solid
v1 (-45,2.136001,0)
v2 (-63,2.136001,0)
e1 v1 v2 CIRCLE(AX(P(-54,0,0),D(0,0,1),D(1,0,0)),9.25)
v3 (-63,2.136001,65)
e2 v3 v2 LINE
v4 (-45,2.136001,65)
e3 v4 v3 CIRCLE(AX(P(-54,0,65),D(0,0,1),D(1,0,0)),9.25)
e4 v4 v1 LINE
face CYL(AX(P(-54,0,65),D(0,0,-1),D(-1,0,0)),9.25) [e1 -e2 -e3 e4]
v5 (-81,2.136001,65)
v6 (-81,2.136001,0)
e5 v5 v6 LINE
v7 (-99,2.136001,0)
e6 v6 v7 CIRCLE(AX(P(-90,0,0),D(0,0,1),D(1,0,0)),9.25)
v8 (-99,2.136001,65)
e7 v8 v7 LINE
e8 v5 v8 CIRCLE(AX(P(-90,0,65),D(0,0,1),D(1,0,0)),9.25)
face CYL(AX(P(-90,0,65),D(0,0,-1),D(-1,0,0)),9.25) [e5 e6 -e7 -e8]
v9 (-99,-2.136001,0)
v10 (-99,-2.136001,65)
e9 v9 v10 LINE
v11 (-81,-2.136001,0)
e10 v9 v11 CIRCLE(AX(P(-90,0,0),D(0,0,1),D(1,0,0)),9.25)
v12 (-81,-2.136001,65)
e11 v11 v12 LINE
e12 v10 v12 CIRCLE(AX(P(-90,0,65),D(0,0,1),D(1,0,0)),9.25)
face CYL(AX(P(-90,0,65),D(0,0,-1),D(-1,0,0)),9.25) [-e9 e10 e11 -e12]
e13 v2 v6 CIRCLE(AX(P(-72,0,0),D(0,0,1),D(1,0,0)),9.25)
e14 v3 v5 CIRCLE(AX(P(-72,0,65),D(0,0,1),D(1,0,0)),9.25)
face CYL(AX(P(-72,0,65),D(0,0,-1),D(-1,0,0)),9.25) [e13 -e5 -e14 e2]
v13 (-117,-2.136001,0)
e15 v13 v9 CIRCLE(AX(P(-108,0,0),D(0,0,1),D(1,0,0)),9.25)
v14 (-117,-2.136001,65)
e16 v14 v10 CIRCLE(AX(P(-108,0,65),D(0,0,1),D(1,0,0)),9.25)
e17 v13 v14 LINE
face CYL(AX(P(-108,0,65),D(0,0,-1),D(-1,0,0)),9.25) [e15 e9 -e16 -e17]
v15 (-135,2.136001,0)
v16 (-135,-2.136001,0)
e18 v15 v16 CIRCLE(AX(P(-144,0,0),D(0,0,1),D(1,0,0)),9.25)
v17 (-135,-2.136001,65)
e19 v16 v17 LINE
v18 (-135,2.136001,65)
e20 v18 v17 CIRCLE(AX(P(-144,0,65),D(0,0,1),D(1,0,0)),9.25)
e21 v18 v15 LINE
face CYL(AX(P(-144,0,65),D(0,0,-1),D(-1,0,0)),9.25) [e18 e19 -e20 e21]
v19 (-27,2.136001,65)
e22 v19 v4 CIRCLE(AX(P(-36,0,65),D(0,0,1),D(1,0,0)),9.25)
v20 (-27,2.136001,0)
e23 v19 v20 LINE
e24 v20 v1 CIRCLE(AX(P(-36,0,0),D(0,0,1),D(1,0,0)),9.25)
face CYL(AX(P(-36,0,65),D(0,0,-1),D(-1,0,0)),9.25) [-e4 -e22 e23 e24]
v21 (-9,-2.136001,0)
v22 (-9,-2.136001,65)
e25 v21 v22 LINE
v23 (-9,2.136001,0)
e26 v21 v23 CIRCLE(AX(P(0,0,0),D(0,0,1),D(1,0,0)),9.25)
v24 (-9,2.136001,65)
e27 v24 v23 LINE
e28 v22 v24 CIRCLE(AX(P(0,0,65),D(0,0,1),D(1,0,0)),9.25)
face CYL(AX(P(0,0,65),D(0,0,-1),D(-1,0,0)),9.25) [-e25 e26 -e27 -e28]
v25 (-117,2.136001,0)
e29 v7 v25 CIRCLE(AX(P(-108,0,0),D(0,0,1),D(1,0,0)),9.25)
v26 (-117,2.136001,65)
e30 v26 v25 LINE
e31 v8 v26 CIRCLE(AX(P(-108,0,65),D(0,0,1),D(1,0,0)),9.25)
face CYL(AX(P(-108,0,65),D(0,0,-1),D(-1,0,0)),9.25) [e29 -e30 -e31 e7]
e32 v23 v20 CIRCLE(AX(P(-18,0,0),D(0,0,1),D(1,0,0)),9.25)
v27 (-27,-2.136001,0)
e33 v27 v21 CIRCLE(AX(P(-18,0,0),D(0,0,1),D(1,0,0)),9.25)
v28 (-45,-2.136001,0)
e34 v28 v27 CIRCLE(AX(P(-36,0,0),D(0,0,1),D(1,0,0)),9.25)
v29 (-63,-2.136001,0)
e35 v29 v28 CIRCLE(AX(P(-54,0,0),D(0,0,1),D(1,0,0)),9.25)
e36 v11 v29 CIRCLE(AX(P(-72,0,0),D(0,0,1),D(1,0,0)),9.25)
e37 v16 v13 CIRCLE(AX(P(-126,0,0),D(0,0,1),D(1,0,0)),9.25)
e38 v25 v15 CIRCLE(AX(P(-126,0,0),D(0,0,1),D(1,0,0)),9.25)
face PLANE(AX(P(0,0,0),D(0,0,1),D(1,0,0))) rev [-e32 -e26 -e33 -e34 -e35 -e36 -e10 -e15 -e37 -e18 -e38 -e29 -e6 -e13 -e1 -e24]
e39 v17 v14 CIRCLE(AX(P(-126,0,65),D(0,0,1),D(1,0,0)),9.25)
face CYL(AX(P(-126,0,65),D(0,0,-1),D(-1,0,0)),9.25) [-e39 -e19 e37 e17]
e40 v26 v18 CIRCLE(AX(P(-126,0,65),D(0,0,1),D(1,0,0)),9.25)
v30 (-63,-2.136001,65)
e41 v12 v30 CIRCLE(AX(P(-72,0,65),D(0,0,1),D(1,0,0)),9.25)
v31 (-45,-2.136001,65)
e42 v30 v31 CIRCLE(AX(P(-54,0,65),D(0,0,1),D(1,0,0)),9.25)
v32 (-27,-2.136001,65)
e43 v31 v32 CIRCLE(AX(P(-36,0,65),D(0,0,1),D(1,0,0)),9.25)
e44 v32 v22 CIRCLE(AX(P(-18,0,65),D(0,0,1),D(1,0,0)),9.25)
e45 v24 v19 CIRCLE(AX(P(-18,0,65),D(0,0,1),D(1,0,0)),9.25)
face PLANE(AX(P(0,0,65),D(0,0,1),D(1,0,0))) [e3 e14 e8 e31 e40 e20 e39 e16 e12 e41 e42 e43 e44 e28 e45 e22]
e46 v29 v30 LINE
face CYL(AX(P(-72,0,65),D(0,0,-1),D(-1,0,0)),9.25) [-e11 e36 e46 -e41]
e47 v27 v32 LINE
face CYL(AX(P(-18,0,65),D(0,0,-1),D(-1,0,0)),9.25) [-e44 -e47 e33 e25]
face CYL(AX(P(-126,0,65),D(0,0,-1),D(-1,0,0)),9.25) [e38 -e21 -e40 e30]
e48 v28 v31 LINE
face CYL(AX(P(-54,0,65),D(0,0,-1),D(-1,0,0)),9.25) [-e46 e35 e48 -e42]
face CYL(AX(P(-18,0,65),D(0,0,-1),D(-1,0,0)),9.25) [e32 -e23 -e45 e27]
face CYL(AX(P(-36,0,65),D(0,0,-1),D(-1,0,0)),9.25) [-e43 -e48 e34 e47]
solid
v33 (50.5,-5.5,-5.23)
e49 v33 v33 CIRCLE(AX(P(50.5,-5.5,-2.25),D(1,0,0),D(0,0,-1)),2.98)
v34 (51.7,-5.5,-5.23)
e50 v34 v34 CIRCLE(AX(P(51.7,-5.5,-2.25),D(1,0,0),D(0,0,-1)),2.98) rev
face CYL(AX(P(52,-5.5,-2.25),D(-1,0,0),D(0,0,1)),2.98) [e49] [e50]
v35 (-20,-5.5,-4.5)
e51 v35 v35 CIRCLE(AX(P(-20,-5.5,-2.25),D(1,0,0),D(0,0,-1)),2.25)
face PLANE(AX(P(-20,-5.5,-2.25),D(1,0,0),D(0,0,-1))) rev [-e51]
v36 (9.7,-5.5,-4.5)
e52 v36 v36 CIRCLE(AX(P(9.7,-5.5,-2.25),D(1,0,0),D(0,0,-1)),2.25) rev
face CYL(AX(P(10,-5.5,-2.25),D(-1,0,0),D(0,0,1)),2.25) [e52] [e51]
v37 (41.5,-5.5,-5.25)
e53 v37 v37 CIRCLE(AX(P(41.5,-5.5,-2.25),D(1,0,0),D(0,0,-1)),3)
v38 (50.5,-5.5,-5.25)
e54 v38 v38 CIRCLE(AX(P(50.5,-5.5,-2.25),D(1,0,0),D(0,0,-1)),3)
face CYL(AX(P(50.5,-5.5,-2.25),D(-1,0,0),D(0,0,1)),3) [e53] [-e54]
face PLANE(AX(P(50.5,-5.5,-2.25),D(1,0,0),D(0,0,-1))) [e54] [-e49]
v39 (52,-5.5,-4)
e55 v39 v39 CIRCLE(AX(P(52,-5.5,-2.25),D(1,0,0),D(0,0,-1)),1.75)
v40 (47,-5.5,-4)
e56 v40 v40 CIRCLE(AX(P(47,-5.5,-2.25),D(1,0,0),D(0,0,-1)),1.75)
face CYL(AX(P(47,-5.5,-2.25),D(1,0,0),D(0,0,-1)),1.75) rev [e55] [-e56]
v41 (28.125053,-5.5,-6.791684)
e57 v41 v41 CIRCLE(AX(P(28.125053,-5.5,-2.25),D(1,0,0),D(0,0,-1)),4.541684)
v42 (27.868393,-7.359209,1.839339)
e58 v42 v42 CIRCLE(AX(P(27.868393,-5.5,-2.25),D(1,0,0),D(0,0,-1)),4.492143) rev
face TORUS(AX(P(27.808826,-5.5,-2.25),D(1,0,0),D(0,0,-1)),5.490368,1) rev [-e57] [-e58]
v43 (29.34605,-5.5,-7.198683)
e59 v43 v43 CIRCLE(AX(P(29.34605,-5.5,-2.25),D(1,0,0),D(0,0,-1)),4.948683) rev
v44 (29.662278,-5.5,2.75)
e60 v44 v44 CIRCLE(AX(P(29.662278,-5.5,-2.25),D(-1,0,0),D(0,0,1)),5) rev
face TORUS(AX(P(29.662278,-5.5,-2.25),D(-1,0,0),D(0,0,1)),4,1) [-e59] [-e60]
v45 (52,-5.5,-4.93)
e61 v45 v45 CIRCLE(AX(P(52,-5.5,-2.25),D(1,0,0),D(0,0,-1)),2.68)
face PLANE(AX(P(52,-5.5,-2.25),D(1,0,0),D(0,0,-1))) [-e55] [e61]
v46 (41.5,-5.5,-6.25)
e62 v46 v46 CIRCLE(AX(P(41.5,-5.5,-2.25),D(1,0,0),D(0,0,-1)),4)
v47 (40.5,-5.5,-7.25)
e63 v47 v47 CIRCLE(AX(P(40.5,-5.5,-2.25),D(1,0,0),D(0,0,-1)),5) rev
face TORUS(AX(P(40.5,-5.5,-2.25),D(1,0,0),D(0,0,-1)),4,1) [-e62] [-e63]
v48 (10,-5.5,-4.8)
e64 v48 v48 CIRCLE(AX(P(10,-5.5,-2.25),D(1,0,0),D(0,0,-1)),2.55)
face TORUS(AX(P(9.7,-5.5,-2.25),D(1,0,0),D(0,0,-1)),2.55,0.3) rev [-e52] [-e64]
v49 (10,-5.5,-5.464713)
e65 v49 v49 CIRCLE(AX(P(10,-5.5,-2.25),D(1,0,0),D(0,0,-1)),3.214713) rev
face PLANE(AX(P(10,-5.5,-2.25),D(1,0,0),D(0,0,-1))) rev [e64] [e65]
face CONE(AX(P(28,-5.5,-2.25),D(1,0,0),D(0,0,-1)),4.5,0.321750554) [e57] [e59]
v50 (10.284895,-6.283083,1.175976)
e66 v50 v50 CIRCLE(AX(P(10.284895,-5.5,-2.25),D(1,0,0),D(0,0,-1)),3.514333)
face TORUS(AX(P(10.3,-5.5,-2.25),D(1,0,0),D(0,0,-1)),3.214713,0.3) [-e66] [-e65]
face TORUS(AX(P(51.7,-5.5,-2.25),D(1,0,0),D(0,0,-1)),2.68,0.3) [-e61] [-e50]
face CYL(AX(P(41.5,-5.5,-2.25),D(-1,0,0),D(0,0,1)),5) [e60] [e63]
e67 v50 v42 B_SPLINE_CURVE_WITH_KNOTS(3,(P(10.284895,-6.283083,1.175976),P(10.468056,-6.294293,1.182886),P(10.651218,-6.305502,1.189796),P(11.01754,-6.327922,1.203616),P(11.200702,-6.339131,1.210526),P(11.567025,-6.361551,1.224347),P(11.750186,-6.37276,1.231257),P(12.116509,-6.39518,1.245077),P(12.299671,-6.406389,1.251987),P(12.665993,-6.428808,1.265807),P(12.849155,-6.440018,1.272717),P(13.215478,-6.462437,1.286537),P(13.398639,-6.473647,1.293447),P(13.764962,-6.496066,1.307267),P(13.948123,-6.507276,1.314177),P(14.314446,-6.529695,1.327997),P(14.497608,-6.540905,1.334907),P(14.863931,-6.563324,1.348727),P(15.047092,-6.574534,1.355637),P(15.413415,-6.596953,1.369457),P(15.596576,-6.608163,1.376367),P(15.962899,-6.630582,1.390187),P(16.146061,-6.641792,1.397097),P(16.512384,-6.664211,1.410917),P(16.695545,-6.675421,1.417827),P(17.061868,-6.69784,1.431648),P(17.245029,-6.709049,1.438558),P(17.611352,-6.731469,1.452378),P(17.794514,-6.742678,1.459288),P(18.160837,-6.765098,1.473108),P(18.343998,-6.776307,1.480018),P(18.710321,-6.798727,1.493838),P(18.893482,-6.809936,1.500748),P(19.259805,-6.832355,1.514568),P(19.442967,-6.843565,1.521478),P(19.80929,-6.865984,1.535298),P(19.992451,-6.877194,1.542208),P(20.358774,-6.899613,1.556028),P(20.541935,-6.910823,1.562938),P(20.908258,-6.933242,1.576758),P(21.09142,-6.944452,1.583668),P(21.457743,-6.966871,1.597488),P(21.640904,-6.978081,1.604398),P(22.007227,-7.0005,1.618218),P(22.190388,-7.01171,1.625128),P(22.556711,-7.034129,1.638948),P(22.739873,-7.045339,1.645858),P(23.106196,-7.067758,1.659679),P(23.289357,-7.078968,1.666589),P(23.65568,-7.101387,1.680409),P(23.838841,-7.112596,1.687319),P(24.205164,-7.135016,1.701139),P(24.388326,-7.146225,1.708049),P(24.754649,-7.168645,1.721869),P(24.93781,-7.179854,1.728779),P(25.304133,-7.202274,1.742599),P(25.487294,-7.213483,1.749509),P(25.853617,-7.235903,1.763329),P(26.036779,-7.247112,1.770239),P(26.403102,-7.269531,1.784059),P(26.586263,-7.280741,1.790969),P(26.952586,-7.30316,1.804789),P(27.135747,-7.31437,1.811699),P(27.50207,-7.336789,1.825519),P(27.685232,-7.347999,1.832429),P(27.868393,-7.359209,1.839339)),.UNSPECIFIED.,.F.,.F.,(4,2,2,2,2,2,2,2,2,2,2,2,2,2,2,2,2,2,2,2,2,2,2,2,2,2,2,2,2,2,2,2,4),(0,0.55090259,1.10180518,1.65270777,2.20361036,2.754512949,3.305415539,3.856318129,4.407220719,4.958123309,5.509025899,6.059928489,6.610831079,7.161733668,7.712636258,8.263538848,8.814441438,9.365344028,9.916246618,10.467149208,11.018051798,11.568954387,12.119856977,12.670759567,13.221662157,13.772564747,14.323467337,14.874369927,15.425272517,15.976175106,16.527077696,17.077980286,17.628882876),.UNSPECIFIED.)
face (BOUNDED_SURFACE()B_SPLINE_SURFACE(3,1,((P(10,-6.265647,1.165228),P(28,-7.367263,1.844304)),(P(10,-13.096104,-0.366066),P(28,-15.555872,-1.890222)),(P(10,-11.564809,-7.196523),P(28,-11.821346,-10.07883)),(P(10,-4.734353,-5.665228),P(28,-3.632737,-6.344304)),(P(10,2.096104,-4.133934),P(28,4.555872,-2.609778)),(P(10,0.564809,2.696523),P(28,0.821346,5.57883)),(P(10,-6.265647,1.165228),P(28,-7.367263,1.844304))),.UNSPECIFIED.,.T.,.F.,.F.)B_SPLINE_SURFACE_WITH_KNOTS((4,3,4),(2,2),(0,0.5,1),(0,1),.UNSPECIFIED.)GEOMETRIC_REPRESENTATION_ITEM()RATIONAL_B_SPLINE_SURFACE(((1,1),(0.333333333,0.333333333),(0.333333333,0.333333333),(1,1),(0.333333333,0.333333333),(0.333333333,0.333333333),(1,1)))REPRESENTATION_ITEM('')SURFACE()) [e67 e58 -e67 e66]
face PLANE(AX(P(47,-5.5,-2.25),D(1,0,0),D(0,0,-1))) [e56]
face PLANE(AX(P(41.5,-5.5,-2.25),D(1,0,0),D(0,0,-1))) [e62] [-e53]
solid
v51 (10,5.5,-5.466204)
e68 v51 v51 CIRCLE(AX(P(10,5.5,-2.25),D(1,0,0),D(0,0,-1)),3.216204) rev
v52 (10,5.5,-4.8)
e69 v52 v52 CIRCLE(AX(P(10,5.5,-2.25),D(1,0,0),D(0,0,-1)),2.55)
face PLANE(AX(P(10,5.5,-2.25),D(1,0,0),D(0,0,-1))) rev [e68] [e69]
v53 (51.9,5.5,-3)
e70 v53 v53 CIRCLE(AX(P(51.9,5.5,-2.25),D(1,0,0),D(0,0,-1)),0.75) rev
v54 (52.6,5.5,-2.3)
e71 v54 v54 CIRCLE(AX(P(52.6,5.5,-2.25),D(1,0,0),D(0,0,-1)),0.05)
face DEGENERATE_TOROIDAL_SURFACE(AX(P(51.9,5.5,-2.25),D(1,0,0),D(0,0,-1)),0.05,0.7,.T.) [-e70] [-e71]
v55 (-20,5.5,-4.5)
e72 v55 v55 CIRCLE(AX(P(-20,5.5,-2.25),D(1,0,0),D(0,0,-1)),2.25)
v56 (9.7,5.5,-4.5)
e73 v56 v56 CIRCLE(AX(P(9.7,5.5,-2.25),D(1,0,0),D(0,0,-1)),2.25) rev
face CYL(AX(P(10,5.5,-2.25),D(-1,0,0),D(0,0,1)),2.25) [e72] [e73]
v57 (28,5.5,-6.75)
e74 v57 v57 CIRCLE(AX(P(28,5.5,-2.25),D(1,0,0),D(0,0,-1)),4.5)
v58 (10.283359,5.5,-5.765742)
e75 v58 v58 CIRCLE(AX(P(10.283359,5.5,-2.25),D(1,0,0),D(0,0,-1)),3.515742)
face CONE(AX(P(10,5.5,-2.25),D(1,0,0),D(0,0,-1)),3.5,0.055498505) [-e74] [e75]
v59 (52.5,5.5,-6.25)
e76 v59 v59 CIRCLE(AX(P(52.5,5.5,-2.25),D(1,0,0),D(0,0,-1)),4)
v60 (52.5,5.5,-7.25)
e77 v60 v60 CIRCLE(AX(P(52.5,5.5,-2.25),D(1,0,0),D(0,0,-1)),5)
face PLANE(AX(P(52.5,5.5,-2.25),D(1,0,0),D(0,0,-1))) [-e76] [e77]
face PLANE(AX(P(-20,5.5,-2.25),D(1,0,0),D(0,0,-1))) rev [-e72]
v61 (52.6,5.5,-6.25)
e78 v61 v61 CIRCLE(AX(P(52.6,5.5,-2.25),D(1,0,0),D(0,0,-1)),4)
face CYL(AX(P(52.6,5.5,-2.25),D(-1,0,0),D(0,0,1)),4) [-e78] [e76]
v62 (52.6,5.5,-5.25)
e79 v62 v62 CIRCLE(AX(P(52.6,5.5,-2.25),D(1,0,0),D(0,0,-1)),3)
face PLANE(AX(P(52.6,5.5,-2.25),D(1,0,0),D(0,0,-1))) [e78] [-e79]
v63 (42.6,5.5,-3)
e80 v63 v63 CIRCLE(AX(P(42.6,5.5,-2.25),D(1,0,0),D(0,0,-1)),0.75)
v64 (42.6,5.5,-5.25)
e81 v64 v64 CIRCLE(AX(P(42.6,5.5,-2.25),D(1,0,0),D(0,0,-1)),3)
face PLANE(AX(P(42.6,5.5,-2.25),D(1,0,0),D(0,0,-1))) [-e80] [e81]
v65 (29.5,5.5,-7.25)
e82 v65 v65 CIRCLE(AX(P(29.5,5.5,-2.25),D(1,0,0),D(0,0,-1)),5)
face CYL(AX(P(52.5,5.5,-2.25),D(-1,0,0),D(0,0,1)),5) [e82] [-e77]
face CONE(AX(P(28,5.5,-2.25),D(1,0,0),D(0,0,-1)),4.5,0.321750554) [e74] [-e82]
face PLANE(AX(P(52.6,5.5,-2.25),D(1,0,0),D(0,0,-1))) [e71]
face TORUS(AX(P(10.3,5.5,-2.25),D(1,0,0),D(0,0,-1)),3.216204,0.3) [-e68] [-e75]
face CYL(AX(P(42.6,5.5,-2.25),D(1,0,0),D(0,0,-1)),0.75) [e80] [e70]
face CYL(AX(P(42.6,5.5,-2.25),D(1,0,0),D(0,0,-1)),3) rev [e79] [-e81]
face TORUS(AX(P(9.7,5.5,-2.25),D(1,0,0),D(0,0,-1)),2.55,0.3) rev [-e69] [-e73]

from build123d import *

# Parameters (mm, degrees)
SKETCH_1_R             = 9.25
EXTRUDE_1_DEPTH        = 65
PATTERN_LINEAR_1_COUNT = 9
PATTERN_LINEAR_1_PITCH = 18
SKETCH_4_R             = 2.25
EXTRUDE_2_DEPTH        = 30
EXTRUDE_2_2_DEPTH      = 30
SKETCH_9_R             = 3.5
SKETCH_10_R            = 4.5
SKETCH_11_R            = 5
SKETCH_14_R            = 4.5
SKETCH_12_R            = 5
SKETCH_13_R            = 4.5
SKETCH_17_R            = 5
EXTRUDE_3_DEPTH        = 23
SKETCH_18_R            = 5
EXTRUDE_4_DEPTH        = 12
SKETCH_19_R            = 3
EXTRUDE_5_DEPTH        = 9
SKETCH_20_R            = 2.98
EXTRUDE_6_DEPTH        = 1.5
SKETCH_21_R            = 4
EXTRUDE_7_DEPTH        = 0.1
SKETCH_22_R            = 3
SKETCH_22_R_2          = 0.75
CUT_EXTRUDE_1_DEPTH    = 10
FILLET_1_R             = 0.3
FILLET_2_R             = 0.7
FILLET_3_R             = 1
FILLET_4_R             = 1
FILLET_5_R             = 0.3
FILLET_6_R             = 0.3
SKETCH_23_R            = 1.75
CUT_EXTRUDE_2_DEPTH    = 5


with BuildPart() as part:
    # 草图1 → 凸台-拉伸1 (new body)
    with BuildSketch(Plane.XY):
        Circle(SKETCH_1_R)
    extrude_1 = extrude(amount=EXTRUDE_1_DEPTH)

    # 阵列(线性)1: 凸台-拉伸1 ×9
    with Locations(*[(-i * PATTERN_LINEAR_1_PITCH, 0, 0) for i in range(1, PATTERN_LINEAR_1_COUNT)]):
        add(extrude_1)


with BuildPart() as body_2:
    # 草图4 → 凸台-拉伸2 (new body)
    with BuildSketch(Plane(origin=(-20, 0, 0), x_dir=(0, 0, -1), z_dir=(1, 0, 0))):
        with Locations((2.25, -5.5)):
            Circle(SKETCH_4_R)
    extrude(amount=EXTRUDE_2_DEPTH)

    # 放样1: read off the stored shape, not the designer's step
    # 放样1: loft between two sections, ruled curve by curve
    loft_1_from = [
        Edge.make_bspline([(10, -6.265647347, 1.165228271), (10, -13.096103888, -0.366066424), (10, -11.564809194, -7.196522965), (10, -4.734352653, -5.665228271), (10, 2.096103888, -4.133933576), (10, 0.564809194, 2.696522965), (10, -6.265647347, 1.165228271)], [0, 0, 0, 0, 0.5, 0.5, 0.5, 1, 1, 1, 1], 3, [1, 0.333333333, 0.333333333, 1, 0.333333333, 0.333333333, 1]),
    ]
    loft_1_to = [
        Edge.make_bspline([(28, -7.36726301, 1.84430444), (28, -15.555871891, -1.89022158), (28, -11.821345871, -10.078830461), (28, -3.63273699, -6.34430444), (28, 4.555871891, -2.60977842), (28, 0.821345871, 5.578830461), (28, -7.36726301, 1.84430444)], [0, 0, 0, 0, 0.5, 0.5, 0.5, 1, 1, 1, 1], 3, [1, 0.333333333, 0.333333333, 1, 0.333333333, 0.333333333, 1]),
    ]
    loft_1 = Solid(Shell([*[Face.make_surface_from_curves(loft_1_from[k], loft_1_to[k]) for k in range(1)], Face(Wire(loft_1_from)), Face(Wire(loft_1_to))]))
    add(loft_1)

    # 草图11 → 放样3 section 0
    with BuildSketch(Plane(origin=(29.5, 0, 0), x_dir=(0, 0, -1), z_dir=(1, 0, 0))):
        with Locations((2.25, -5.5)):
            Circle(SKETCH_11_R)
    # 草图14 → 放样3 section 1
    with BuildSketch(Plane(origin=(28, 0, 0), x_dir=(0, 0, -1), z_dir=(1, 0, 0))):
        with Locations((2.25, -5.5)):
            Circle(SKETCH_14_R)
    loft()

    # 草图18 → 凸台-拉伸4 (add)
    with BuildSketch(Plane(origin=(29.5, 0, 0), x_dir=(0, 0, -1), z_dir=(1, 0, 0))):
        with Locations((2.25, -5.5)):
            Circle(SKETCH_18_R)
    extrude(amount=EXTRUDE_4_DEPTH)

    # 草图19 → 凸台-拉伸5 (add)
    with BuildSketch(Plane(origin=(41.5, 0, 0), x_dir=(0, 0, -1), z_dir=(1, 0, 0))):
        with Locations((2.25, -5.5)):
            Circle(SKETCH_19_R)
    extrude(amount=EXTRUDE_5_DEPTH)

    # 草图20 → 凸台-拉伸6 (add)
    with BuildSketch(Plane(origin=(50.5, 0, 0), x_dir=(0, 0, -1), z_dir=(1, 0, 0))):
        with Locations((2.25, -5.5)):
            Circle(SKETCH_20_R)
    extrude(amount=EXTRUDE_6_DEPTH)

    # 圆角1
    fillet_1_edges = [body_2.edges().sort_by_distance(p)[0] for p in [
        (52, -5.5, 0.73),
    ]]
    fillet(fillet_1_edges, radius=FILLET_1_R)

    # 圆角3
    fillet_3_edges = [body_2.edges().sort_by_distance(p)[0] for p in [
        (41.5, -5.5, 2.75),
    ]]
    fillet(fillet_3_edges, radius=FILLET_3_R)

    # 圆角4
    fillet_4_edges = [body_2.edges().sort_by_distance(p)[0] for p in [
        (29.5, -5.5, 2.75),
        (28, -1.102593379, -1.294586471),
        (28, -9.897406621, -3.205413528),
    ]]
    fillet(fillet_4_edges, radius=FILLET_4_R)

    # 圆角5
    fillet_5_edges = [body_2.edges().sort_by_distance(p)[0] for p in [
        (10, -5.5, 0),
        (10, -4.734352653, -5.665228271),
    ]]
    fillet(fillet_5_edges, radius=FILLET_5_R)

    # 草图23 → 切除-拉伸2 (cut)
    with BuildSketch(Plane(origin=(52, 0, 0), x_dir=(0, 0, -1), z_dir=(1, 0, 0))):
        with Locations((2.25, -5.5)):
            Circle(SKETCH_23_R)
    extrude(amount=-CUT_EXTRUDE_2_DEPTH, mode=Mode.SUBTRACT)


with BuildPart() as body_3:
    # 草图4 → Extrude 2 2 (new body)
    with BuildSketch(Plane(origin=(-20, 0, 0), x_dir=(0, 0, -1), z_dir=(1, 0, 0))):
        with Locations((2.25, 5.5)):
            Circle(SKETCH_4_R)
    extrude(amount=EXTRUDE_2_2_DEPTH)

    # 草图9 → 放样2 section 0
    with BuildSketch(Plane(origin=(10, 0, 0), x_dir=(0, 0, -1), z_dir=(1, 0, 0))):
        with Locations((2.25, 5.5)):
            Circle(SKETCH_9_R)
    # 草图10 → 放样2 section 1
    with BuildSketch(Plane(origin=(28, 0, 0), x_dir=(0, 0, -1), z_dir=(1, 0, 0))):
        with Locations((2.25, 5.5)):
            Circle(SKETCH_10_R)
    loft()

    # 草图12 → 放样4 section 0
    with BuildSketch(Plane(origin=(29.5, 0, 0), x_dir=(0, 0, -1), z_dir=(1, 0, 0))):
        with Locations((2.25, 5.5)):
            Circle(SKETCH_12_R)
    # 草图13 → 放样4 section 1
    with BuildSketch(Plane(origin=(28, 0, 0), x_dir=(0, 0, -1), z_dir=(1, 0, 0))):
        with Locations((2.25, 5.5)):
            Circle(SKETCH_13_R)
    loft()

    # 草图17 → 凸台-拉伸3 (add)
    with BuildSketch(Plane(origin=(29.5, 0, 0), x_dir=(0, 0, -1), z_dir=(1, 0, 0))):
        with Locations((2.25, 5.5)):
            Circle(SKETCH_17_R)
    extrude(amount=EXTRUDE_3_DEPTH)

    # 草图21 → 凸台-拉伸7 (add)
    with BuildSketch(Plane(origin=(52.5, 0, 0), x_dir=(0, 0, -1), z_dir=(1, 0, 0))):
        with Locations((2.25, 5.5)):
            Circle(SKETCH_21_R)
    extrude(amount=EXTRUDE_7_DEPTH)

    # 草图22 → 切除-拉伸1 (cut)
    with BuildSketch(Plane(origin=(52.6, 0, 0), x_dir=(0, 0, -1), z_dir=(1, 0, 0))):
        with Locations((2.25, 5.5)):
            Circle(SKETCH_22_R)
        with Locations((2.25, 5.5)):
            Circle(SKETCH_22_R_2, mode=Mode.SUBTRACT)
    extrude(amount=-CUT_EXTRUDE_1_DEPTH, mode=Mode.SUBTRACT)

    # 圆角2
    fillet_2_edges = [body_3.edges().sort_by_distance(p)[0] for p in [
        (52.6, 5.5, -1.5),
    ]]
    fillet(fillet_2_edges, radius=FILLET_2_R)

    # 圆角6
    fillet_6_edges = [body_3.edges().sort_by_distance(p)[0] for p in [
        (10, 5.5, 0),
        (10, 5.5, 1.25),
    ]]
    fillet(fillet_6_edges, radius=FILLET_6_R)


solid = Compound([part.part, body_2.part, body_3.part])
